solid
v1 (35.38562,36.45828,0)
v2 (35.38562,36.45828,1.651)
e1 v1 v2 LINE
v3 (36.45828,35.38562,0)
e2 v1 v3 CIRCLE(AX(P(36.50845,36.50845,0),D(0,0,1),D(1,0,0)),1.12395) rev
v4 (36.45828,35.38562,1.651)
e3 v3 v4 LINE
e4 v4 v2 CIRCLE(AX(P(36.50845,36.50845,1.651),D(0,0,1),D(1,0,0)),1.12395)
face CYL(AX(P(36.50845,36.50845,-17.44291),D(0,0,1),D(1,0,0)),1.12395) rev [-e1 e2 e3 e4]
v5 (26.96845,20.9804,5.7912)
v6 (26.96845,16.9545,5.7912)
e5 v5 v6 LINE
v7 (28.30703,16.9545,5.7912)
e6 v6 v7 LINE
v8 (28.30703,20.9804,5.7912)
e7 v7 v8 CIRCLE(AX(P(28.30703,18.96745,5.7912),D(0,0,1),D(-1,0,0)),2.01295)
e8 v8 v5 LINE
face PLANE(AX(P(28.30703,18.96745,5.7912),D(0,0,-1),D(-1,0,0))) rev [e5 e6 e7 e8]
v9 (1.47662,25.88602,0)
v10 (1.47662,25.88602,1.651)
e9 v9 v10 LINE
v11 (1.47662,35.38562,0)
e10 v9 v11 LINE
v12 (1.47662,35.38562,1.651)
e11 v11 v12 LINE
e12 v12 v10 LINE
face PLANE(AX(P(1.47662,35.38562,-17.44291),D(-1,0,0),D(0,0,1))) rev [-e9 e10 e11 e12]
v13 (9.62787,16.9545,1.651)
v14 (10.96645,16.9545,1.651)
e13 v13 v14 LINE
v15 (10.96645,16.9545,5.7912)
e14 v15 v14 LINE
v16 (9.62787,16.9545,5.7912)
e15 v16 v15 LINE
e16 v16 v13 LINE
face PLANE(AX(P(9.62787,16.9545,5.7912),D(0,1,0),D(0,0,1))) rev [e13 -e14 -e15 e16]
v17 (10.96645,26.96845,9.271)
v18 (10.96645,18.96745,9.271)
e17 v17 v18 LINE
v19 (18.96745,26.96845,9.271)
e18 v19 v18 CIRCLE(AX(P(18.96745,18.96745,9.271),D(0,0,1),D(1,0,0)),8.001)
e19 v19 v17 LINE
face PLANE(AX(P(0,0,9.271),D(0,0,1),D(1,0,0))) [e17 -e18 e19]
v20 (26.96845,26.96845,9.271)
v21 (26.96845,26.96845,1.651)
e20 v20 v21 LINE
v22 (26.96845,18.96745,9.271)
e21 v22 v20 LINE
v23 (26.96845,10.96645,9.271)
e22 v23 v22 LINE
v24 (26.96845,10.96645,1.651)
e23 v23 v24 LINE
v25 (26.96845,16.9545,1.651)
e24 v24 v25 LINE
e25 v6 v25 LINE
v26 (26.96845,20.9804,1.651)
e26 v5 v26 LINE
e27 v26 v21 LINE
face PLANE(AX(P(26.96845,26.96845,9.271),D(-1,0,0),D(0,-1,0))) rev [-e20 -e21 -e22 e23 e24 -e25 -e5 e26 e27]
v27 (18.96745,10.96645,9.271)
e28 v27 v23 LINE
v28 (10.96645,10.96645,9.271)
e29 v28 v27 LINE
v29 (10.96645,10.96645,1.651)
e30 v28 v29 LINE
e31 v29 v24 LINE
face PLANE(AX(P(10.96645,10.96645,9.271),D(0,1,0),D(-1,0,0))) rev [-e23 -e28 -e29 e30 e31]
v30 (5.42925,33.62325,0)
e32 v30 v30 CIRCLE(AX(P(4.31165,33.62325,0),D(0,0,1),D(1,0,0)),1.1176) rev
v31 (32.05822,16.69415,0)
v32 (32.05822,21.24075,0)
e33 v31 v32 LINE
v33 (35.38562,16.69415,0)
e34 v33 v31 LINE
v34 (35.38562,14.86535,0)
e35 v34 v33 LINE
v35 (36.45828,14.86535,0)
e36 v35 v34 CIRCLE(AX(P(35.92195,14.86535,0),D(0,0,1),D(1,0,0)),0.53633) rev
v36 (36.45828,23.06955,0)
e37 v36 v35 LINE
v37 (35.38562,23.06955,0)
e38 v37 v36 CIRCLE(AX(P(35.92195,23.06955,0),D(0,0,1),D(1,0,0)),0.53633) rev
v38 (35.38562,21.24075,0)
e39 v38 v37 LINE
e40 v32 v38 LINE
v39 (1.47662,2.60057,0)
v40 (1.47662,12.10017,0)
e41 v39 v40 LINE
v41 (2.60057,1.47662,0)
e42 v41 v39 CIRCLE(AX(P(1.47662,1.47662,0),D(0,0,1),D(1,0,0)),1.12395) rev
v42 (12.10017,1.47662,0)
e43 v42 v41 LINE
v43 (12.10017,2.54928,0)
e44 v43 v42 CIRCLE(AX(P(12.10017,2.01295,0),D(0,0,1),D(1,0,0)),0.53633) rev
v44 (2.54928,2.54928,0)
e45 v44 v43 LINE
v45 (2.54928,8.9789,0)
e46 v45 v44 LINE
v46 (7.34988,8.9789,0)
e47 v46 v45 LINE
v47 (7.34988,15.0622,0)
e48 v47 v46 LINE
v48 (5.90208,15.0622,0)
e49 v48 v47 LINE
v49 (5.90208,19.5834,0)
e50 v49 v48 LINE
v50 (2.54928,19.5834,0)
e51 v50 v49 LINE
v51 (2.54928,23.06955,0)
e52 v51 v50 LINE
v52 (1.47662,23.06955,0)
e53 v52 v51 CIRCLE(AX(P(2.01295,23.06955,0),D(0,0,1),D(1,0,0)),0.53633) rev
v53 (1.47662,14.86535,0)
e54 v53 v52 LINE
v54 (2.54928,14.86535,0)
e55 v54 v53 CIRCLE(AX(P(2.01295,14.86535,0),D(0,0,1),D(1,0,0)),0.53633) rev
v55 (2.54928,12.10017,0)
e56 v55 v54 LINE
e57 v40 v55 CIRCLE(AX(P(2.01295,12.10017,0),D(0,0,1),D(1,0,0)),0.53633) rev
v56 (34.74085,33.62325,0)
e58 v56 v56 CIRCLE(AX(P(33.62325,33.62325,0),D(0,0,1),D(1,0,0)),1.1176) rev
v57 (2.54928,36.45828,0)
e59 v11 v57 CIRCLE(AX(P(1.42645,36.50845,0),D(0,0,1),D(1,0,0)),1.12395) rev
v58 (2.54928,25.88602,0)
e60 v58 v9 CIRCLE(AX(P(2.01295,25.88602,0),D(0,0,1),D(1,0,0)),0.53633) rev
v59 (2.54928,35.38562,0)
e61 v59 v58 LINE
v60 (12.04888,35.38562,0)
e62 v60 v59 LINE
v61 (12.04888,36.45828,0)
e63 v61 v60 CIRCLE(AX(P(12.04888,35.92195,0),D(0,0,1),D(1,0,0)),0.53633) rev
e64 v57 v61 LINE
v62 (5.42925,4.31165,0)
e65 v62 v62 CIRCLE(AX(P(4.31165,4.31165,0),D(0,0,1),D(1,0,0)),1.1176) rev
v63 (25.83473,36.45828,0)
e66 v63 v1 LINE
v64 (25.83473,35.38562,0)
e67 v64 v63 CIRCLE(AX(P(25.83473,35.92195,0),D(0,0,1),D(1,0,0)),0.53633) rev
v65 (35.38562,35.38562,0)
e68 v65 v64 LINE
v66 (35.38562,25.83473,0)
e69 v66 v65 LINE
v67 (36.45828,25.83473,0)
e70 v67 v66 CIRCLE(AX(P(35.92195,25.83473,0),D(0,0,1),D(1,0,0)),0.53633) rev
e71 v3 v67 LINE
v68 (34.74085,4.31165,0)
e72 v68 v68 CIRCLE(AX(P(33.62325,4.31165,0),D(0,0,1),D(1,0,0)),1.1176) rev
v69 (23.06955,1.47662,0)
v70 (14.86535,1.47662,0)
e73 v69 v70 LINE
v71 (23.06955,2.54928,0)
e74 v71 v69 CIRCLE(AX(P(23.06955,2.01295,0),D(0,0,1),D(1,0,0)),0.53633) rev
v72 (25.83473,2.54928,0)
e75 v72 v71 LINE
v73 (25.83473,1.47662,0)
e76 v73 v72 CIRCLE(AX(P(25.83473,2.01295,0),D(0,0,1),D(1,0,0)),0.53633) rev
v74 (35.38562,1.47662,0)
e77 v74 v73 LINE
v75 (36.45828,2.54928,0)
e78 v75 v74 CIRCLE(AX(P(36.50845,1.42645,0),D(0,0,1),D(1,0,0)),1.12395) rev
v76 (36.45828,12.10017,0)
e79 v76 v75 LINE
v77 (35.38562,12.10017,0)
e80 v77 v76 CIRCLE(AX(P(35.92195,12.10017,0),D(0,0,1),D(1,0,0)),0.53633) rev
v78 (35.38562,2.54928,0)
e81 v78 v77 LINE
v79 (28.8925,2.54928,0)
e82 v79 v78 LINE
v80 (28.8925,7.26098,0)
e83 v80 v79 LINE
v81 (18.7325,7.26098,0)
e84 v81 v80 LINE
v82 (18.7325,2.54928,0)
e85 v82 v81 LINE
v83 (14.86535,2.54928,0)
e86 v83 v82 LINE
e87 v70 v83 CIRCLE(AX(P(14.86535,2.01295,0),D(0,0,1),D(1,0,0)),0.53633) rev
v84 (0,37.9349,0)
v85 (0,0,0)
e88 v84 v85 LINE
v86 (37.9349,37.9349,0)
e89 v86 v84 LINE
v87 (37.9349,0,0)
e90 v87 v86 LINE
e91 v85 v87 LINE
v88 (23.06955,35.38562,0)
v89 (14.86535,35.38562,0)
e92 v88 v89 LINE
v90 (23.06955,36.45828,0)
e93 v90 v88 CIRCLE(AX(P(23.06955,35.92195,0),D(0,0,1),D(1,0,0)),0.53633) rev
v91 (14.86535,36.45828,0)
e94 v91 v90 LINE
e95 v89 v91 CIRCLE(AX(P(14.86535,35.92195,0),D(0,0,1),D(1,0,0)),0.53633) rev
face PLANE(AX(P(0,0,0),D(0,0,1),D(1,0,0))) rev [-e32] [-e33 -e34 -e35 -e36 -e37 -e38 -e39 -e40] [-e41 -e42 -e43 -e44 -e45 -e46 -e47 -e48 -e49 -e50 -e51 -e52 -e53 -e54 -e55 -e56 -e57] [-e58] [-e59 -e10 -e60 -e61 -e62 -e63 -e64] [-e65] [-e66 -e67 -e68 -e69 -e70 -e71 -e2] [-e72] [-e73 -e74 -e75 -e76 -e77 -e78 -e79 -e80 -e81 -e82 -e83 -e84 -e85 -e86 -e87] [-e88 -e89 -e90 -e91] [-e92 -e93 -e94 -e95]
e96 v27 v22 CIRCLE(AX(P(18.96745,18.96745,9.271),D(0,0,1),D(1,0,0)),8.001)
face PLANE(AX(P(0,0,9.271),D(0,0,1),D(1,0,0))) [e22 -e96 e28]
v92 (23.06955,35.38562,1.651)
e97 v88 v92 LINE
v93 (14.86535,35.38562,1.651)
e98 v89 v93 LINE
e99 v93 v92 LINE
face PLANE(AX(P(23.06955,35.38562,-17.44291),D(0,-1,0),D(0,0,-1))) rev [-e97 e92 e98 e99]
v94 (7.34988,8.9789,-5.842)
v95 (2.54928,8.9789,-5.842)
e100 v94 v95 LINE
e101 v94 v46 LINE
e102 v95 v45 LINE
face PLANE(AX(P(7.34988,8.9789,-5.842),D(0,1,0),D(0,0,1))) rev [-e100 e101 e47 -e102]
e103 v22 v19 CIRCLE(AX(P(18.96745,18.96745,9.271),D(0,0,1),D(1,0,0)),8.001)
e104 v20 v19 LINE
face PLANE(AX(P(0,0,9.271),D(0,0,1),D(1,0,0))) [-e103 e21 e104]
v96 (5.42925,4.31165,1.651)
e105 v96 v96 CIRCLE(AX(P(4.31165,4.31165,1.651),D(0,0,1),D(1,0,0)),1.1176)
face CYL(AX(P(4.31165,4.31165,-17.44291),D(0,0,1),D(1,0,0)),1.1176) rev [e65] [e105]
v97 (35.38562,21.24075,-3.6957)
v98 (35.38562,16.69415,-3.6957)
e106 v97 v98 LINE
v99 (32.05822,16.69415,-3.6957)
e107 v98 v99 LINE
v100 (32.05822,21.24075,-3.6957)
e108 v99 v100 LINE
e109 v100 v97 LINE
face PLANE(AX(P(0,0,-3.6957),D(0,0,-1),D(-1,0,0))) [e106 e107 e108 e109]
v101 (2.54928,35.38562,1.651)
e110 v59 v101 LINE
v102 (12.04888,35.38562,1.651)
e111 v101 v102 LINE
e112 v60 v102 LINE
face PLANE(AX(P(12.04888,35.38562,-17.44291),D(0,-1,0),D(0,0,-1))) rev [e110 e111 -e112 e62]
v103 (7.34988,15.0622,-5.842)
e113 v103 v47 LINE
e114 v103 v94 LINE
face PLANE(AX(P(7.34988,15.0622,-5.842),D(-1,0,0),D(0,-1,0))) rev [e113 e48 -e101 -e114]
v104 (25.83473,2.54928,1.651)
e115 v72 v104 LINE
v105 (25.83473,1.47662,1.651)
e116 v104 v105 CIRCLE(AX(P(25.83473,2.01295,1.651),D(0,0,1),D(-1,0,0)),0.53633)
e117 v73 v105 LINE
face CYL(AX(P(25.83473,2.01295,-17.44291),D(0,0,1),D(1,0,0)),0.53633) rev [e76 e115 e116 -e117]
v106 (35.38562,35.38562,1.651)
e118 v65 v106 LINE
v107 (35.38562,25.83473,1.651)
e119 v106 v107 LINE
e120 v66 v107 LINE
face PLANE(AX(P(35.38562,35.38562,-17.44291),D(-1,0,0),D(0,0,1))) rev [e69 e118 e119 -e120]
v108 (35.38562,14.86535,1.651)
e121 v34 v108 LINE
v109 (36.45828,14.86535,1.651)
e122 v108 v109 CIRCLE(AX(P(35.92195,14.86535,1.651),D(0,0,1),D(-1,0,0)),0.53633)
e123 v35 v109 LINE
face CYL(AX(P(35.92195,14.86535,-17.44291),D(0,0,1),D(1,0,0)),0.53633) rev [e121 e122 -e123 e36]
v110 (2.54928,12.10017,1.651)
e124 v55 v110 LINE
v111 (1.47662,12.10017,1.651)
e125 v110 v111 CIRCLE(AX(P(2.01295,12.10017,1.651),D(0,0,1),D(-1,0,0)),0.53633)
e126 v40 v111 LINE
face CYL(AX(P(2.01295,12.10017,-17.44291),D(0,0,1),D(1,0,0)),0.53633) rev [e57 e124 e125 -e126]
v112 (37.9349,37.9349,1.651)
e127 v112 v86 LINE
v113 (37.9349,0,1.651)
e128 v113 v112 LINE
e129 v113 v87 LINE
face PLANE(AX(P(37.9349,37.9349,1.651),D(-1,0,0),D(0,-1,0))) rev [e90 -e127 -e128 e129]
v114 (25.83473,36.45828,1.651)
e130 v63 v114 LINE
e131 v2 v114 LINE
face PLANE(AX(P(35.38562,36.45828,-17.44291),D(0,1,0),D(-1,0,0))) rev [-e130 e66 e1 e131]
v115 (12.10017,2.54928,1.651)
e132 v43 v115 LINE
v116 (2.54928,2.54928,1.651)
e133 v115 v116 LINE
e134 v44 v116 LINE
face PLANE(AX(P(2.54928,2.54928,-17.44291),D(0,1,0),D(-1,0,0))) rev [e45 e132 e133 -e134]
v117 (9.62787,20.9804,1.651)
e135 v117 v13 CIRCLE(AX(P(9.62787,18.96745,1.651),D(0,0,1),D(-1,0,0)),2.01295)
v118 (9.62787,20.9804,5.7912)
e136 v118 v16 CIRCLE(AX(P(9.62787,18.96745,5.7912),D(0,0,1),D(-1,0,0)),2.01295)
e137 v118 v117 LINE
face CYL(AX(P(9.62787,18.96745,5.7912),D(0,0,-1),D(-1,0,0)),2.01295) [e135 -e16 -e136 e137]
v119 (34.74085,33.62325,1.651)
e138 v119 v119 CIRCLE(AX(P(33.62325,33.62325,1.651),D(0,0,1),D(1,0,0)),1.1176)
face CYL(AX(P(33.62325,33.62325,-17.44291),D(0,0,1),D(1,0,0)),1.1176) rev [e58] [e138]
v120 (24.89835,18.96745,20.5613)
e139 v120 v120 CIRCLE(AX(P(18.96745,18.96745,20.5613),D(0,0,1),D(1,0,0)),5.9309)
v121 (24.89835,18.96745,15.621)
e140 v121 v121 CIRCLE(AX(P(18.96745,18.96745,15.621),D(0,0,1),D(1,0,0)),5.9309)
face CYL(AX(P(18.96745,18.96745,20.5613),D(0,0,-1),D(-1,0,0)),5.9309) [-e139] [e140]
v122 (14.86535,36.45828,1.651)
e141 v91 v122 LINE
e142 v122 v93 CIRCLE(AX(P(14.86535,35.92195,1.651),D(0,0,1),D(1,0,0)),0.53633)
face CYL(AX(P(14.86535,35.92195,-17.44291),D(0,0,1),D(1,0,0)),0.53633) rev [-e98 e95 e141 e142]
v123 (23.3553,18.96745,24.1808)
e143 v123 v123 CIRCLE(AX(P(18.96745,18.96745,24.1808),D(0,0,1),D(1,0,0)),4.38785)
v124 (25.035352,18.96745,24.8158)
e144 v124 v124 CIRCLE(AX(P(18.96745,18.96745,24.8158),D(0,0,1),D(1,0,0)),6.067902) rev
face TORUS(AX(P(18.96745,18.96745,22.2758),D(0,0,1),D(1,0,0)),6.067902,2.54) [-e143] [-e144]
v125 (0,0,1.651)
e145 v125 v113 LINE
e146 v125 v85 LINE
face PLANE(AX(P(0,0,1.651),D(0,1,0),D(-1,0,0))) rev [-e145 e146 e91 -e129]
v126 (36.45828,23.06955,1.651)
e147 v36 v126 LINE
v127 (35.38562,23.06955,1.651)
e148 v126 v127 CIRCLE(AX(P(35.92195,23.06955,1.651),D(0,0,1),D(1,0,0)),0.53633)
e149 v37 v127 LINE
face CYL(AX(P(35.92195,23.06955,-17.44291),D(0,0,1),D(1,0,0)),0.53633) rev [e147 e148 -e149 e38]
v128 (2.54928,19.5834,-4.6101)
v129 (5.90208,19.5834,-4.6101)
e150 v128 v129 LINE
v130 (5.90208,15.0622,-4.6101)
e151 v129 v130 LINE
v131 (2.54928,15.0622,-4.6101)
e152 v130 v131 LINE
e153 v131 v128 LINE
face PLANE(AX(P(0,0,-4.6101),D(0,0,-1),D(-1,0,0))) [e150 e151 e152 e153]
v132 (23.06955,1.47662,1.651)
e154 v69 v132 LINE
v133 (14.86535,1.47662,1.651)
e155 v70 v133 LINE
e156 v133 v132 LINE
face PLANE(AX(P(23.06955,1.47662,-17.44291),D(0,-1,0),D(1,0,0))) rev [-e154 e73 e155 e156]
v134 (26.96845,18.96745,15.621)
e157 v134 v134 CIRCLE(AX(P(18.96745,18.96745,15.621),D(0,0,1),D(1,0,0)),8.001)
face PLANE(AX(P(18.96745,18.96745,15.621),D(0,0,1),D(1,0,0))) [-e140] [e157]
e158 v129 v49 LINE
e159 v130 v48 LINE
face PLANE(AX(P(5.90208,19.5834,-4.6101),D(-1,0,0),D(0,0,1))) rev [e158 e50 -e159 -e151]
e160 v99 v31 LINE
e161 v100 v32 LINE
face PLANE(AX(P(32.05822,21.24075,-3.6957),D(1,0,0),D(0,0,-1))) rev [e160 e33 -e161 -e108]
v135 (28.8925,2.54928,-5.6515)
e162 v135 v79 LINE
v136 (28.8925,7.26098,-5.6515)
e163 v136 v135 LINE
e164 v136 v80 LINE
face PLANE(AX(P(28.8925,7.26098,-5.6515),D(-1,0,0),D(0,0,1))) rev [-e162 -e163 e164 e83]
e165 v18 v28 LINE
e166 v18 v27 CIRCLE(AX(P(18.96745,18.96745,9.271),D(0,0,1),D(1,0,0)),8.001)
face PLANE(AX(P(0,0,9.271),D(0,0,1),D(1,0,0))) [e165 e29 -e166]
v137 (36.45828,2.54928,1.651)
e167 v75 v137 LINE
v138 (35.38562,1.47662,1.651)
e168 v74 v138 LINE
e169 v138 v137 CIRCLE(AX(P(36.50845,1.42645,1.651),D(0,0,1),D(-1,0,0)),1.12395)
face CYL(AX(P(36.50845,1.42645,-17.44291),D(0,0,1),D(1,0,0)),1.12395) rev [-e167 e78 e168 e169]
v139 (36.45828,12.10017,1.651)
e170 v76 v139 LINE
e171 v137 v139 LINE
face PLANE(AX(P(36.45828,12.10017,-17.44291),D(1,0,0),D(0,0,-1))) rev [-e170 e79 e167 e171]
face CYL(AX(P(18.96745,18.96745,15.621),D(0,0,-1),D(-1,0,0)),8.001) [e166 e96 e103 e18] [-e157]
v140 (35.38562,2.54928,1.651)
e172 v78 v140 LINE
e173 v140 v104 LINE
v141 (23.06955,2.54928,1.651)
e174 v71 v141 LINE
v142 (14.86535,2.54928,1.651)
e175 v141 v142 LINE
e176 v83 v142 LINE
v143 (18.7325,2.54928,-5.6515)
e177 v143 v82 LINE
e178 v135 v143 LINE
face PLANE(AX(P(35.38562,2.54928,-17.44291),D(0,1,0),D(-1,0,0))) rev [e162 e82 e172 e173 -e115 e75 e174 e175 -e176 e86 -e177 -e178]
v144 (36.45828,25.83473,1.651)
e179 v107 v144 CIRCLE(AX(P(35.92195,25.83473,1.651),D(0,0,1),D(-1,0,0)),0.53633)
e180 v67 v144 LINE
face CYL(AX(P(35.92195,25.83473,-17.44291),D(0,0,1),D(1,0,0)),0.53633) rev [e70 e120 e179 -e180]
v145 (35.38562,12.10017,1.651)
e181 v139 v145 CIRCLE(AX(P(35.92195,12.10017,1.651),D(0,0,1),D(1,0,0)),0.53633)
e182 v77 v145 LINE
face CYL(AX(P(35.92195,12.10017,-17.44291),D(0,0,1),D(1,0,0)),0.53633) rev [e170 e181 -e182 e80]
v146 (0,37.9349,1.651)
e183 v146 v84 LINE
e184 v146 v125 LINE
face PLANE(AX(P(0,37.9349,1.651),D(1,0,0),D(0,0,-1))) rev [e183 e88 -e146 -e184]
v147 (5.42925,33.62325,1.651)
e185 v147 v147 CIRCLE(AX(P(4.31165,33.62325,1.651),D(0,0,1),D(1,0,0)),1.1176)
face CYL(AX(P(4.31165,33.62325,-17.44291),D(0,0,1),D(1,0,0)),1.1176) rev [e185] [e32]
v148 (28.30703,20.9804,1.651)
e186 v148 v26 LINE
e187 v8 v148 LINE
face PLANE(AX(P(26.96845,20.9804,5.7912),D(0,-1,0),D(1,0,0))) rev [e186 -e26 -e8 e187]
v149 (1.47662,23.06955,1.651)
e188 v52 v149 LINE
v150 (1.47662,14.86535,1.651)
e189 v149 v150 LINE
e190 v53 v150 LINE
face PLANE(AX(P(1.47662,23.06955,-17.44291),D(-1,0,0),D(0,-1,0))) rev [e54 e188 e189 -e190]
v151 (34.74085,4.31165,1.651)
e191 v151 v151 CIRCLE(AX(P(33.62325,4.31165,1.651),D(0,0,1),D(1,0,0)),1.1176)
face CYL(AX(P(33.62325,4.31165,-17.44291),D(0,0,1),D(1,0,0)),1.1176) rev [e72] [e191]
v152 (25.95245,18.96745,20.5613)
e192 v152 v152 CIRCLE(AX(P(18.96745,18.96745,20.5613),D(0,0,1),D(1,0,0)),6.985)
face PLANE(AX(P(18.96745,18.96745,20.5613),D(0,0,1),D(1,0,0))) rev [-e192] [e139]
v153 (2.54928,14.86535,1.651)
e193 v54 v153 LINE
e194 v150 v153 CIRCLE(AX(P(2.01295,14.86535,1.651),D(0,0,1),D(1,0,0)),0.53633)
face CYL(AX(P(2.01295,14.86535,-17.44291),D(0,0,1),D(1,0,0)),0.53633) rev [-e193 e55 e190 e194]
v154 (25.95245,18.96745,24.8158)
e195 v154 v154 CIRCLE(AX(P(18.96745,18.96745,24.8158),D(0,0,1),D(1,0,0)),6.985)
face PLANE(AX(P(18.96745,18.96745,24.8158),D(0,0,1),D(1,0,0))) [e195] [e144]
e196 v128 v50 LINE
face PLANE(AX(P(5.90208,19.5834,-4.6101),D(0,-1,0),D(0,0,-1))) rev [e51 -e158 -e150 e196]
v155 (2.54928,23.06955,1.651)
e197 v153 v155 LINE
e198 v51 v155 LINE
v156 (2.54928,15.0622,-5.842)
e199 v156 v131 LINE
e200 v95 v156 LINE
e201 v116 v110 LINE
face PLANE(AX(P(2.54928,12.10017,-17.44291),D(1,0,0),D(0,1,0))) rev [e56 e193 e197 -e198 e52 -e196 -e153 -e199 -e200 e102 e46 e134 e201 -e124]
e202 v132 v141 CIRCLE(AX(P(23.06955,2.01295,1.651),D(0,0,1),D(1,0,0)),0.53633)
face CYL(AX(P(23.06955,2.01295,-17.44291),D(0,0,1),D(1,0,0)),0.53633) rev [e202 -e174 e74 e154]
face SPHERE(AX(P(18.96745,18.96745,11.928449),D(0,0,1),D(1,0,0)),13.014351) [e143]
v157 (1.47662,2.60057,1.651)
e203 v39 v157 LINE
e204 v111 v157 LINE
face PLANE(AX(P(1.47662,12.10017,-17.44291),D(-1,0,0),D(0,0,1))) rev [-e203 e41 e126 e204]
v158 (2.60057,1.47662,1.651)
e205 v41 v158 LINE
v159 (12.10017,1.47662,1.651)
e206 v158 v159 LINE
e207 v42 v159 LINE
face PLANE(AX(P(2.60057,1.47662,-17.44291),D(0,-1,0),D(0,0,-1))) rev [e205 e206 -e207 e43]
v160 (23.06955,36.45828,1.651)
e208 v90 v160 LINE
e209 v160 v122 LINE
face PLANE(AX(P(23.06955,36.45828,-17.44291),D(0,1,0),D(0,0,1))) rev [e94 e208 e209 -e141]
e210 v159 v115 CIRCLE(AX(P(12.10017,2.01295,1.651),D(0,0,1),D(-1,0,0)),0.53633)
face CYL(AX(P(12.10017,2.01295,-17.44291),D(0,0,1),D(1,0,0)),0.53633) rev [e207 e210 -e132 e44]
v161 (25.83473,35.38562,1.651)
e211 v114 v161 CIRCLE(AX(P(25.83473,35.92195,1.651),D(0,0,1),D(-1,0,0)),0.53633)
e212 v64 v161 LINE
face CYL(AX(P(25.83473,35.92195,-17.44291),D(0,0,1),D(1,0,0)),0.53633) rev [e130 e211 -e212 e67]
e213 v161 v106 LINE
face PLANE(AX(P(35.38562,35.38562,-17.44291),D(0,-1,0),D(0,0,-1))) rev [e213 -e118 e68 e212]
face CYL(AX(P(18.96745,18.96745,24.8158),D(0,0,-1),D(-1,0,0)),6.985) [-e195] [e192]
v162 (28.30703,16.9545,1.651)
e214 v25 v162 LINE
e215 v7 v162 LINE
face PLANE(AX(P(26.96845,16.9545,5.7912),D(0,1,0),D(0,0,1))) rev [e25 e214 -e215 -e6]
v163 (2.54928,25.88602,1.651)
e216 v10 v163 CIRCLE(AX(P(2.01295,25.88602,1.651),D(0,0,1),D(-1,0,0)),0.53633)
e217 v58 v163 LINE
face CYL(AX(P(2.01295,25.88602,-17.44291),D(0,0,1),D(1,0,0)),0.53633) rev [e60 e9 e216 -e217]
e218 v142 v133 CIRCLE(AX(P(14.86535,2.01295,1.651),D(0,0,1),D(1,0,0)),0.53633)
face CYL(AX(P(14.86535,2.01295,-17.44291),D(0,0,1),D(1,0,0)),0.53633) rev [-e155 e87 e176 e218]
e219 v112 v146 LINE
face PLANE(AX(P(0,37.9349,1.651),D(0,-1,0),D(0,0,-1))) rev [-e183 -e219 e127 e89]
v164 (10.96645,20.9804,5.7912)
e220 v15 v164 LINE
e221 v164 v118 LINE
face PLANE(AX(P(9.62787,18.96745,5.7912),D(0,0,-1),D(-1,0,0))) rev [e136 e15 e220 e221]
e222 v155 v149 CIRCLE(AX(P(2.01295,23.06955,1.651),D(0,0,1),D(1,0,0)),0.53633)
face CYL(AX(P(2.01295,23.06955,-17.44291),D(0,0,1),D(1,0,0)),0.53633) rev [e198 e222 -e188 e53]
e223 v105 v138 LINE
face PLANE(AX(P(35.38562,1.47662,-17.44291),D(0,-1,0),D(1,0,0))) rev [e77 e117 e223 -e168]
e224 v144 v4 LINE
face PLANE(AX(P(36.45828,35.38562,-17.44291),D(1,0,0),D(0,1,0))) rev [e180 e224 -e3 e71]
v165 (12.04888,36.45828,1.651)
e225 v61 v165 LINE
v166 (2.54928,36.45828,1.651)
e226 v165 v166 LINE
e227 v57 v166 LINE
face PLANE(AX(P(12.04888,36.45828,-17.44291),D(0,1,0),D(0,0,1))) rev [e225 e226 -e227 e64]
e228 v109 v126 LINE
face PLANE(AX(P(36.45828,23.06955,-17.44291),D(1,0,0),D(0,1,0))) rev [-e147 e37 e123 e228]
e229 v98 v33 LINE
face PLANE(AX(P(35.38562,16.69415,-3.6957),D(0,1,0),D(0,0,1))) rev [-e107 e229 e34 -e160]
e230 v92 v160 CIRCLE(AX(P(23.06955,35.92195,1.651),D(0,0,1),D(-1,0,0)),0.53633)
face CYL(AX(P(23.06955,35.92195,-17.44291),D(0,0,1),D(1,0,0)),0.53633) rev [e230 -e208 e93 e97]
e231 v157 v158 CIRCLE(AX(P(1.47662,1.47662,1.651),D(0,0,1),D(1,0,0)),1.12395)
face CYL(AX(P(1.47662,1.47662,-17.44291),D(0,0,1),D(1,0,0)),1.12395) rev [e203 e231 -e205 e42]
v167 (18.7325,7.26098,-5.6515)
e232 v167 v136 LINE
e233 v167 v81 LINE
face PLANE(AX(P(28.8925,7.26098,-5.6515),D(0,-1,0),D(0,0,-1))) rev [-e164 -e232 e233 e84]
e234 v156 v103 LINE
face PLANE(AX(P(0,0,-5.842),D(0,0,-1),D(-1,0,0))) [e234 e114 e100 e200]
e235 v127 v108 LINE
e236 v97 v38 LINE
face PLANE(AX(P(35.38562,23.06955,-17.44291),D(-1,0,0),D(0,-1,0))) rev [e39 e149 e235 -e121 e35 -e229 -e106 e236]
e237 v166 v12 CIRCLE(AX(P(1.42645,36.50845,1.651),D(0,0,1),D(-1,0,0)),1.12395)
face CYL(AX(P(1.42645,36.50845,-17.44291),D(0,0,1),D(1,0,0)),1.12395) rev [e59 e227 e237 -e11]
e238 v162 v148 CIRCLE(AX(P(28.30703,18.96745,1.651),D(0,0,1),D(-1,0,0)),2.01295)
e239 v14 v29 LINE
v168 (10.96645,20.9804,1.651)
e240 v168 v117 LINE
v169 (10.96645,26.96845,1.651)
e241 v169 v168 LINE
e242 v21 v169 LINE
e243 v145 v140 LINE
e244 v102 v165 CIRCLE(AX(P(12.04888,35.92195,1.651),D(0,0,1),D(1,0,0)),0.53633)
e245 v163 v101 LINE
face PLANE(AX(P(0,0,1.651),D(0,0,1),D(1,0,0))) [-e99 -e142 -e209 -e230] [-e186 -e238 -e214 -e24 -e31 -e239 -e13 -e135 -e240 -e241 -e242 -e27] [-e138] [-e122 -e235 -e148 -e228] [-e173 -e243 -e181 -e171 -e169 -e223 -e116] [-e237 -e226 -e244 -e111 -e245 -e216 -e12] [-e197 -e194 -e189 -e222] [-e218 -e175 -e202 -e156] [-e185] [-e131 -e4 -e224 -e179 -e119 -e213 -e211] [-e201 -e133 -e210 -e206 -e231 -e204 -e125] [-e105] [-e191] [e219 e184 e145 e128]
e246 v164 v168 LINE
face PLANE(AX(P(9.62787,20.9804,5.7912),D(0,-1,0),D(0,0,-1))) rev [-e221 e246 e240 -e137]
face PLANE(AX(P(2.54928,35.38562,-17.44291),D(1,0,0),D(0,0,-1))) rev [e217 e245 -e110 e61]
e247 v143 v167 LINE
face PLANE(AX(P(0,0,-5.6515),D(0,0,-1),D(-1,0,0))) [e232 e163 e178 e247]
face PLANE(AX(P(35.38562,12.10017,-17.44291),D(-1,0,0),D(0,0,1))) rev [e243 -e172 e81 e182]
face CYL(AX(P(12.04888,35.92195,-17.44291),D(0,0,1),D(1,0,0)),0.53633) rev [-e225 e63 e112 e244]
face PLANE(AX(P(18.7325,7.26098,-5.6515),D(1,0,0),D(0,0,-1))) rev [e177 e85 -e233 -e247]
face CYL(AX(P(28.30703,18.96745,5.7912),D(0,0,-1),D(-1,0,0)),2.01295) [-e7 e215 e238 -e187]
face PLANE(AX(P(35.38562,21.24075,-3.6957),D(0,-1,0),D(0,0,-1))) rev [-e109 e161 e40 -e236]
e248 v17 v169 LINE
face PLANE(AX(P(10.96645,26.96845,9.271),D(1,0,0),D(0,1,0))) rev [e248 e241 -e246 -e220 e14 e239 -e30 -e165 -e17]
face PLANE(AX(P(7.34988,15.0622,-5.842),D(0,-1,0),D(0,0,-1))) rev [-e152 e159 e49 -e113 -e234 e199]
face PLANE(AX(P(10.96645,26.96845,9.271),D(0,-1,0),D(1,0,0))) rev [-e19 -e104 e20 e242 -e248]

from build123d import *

# Parameters (mm, degrees)
SKETCH1_W            = 37.9349
SKETCH1_H            = 37.9349
BOSS_EXTRUDE1_DEPTH  = 1.651
SKETCH2_W            = 16.002
SKETCH2_H            = 16.002
BOSS_EXTRUDE2_DEPTH  = 7.62
SKETCH3_R            = 8.001
BOSS_EXTRUDE3_DEPTH  = 6.35
SKETCH4_R            = 5.9309
BOSS_EXTRUDE4_DEPTH  = 4.9403
SKETCH5_R            = 6.985
BOSS_EXTRUDE5_DEPTH  = 4.2545
SKETCH6_R            = 4.38785
CUT_EXTRUDE1_DEPTH   = 0.635
FILLET2_R            = 2.54
SKETCH9_R            = 1.1176
CUT_EXTRUDE2_DEPTH   = 1.651
SKETCH12_W           = 3.3274
SKETCH12_H           = 4.5466
BOSS_EXTRUDE6_DEPTH  = 3.6957
SKETCH13_W           = 10.16
SKETCH13_H           = 4.7117
BOSS_EXTRUDE7_DEPTH  = 5.6515
SKETCH14_W           = 4.8006
SKETCH14_H           = 6.0833
BOSS_EXTRUDE8_DEPTH  = 5.842
SKETCH15_W           = 3.3528
SKETCH15_H           = 4.5212
BOSS_EXTRUDE9_DEPTH  = 4.6101
BOSS_EXTRUDE10_DEPTH = 4.1402


# Read off the part's stored shape, not the designer's step: Dome1
with BuildPart() as part:
    # Sketch1 → Boss-Extrude1 (new body)
    with BuildSketch(Plane.XY):
        with Locations((18.96745, 18.96745)):
            Rectangle(SKETCH1_W, SKETCH1_H)
    extrude(amount=BOSS_EXTRUDE1_DEPTH)

    # Sketch2 → Boss-Extrude2 (add)
    with BuildSketch(Plane.XY.offset(1.651)):
        with Locations((18.96745, 18.96745)):
            Rectangle(SKETCH2_W, SKETCH2_H)
    extrude(amount=BOSS_EXTRUDE2_DEPTH)

    # Sketch3 → Boss-Extrude3 (add)
    with BuildSketch(Plane.XY.offset(9.271)):
        with Locations((18.96745, 18.96745)):
            Circle(SKETCH3_R)
    extrude(amount=BOSS_EXTRUDE3_DEPTH)

    # Sketch4 → Boss-Extrude4 (add)
    with BuildSketch(Plane.XY.offset(15.621)):
        with Locations((18.96745, 18.96745)):
            Circle(SKETCH4_R)
    extrude(amount=BOSS_EXTRUDE4_DEPTH)

    # Sketch5 → Boss-Extrude5 (add)
    with BuildSketch(Plane.XY.offset(20.5613)):
        with Locations((18.96745, 18.96745)):
            Circle(SKETCH5_R)
    extrude(amount=BOSS_EXTRUDE5_DEPTH)

    # Sketch6 → Cut-Extrude1 (cut)
    with BuildSketch(Plane.XY.offset(24.8158)):
        with Locations((18.96745, 18.96745)):
            Circle(SKETCH6_R)
    extrude(amount=-CUT_EXTRUDE1_DEPTH, mode=Mode.SUBTRACT)

    # Fillet2
    # the kernel refuses this fillet: 2.54 mm, written as the material it takes off along each edge
    with BuildSketch(Plane(origin=(18.96745, 18.96745, 24.8158), x_dir=(1, 0, 0), z_dir=(0, -1, 0))) as fillet2_piece_1:
        with BuildLine():
            CenterArc((6.067902083, -2.54), FILLET2_R, 90, 41.409622109)
            Line((4.38785, -0.635), (4.354248958, -0.5969))
            ThreePointArc((4.354248958, -0.5969), (4.33705, -0.3175), (4.33705, 0))
            Line((4.33705, 0), (4.38785, 0.0508))
            Line((4.38785, 0.0508), (6.067902083, 0.0508))
            Line((6.067902083, 0.0508), (6.067902083, 0))
        make_face()
    revolve(axis=Axis((18.96745, 18.96745, 24.8158), (0, 0, 1)), mode=Mode.SUBTRACT)

    # Dome1 outline → Dome1 (revolve)
    with BuildSketch(Plane(origin=(18.96745, 18.96745, 0), x_dir=(1, 0, 0), z_dir=(0, -1, 0))):
        with BuildLine():
            Line((0, 24.1808), (4.387850012, 24.180799996))
            ThreePointArc((4.387850012, 24.180799996), (2.22676176, 24.75088497), (0, 24.9428))
            Line((0, 24.9428), (0, 24.1808))
        make_face()
    revolve(axis=Axis((18.96745, 18.96745, 0), (0, 0, 1)))

    # Sketch9 → Cut-Extrude2 (cut)
    with BuildSketch(Plane.XY.offset(1.651)):
        with Locations((33.62325, 33.62325)):
            Circle(SKETCH9_R)
        with Locations((4.31165, 33.62325)):
            Circle(SKETCH9_R)
        with Locations((4.31165, 4.31165)):
            Circle(SKETCH9_R)
        with Locations((33.62325, 4.31165)):
            Circle(SKETCH9_R)
        with BuildLine():
            Line((35.385619933, 12.100169933), (35.385619933, 2.549280067))
            Line((35.385619933, 2.549280067), (25.834730067, 2.549280067))
            ThreePointArc((25.834730067, 2.549280067), (25.2984, 2.01295), (25.834730067, 1.476619933))
            Line((25.834730067, 1.476619933), (35.385619933, 1.476619933))
            ThreePointArc((35.385619933, 1.476619933), (37.303202335, 0.631697665), (36.458280067, 2.549280067))
            Line((36.458280067, 2.549280067), (36.458280067, 12.100169933))
            ThreePointArc((36.458280067, 12.100169933), (35.92195, 12.6365), (35.385619933, 12.100169933))
        make_face()
        with BuildLine():
            Line((35.385619933, 36.458280067), (25.834730067, 36.458280067))
            ThreePointArc((25.834730067, 36.458280067), (25.2984, 35.92195), (25.834730067, 35.385619933))
            Line((25.834730067, 35.385619933), (35.385619933, 35.385619933))
            Line((35.385619933, 35.385619933), (35.385619933, 25.834730067))
            ThreePointArc((35.385619933, 25.834730067), (35.92195, 25.2984), (36.458280067, 25.834730067))
            Line((36.458280067, 25.834730067), (36.458280067, 35.385619933))
            ThreePointArc((36.458280067, 35.385619933), (37.303202335, 37.303202335), (35.385619933, 36.458280067))
        make_face()
        with BuildLine():
            Line((12.048880067, 36.458280067), (2.549280067, 36.458280067))
            ThreePointArc((2.549280067, 36.458280067), (0.631697665, 37.303202335), (1.476619933, 35.385619933))
            Line((1.476619933, 35.385619933), (1.476619933, 25.886019933))
            ThreePointArc((1.476619933, 25.886019933), (2.01295, 25.349689867), (2.549280067, 25.886019933))
            Line((2.549280067, 25.886019933), (2.549280067, 35.385619933))
            Line((2.549280067, 35.385619933), (12.048880067, 35.385619933))
            ThreePointArc((12.048880067, 35.385619933), (12.585210133, 35.92195), (12.048880067, 36.458280067))
        make_face()
        with BuildLine():
            Line((23.06955, 36.458280067), (14.86535, 36.458280067))
            ThreePointArc((14.86535, 36.458280067), (14.329019933, 35.92195), (14.86535, 35.385619933))
            Line((14.86535, 35.385619933), (23.06955, 35.385619933))
            ThreePointArc((23.06955, 35.385619933), (23.605880067, 35.92195), (23.06955, 36.458280067))
        make_face()
        with BuildLine():
            Line((2.549280067, 23.06955), (2.549280067, 14.86535))
            ThreePointArc((2.549280067, 14.86535), (2.01295, 14.329019933), (1.476619933, 14.86535))
            Line((1.476619933, 14.86535), (1.476619933, 23.06955))
            ThreePointArc((1.476619933, 23.06955), (2.01295, 23.605880067), (2.549280067, 23.06955))
        make_face()
        with BuildLine():
            Line((36.458280067, 23.06955), (36.458280067, 14.86535))
            ThreePointArc((36.458280067, 14.86535), (35.92195, 14.329019933), (35.385619933, 14.86535))
            Line((35.385619933, 14.86535), (35.385619933, 23.06955))
            ThreePointArc((35.385619933, 23.06955), (35.92195, 23.605880067), (36.458280067, 23.06955))
        make_face()
        with BuildLine():
            Line((23.06955, 2.549280067), (14.86535, 2.549280067))
            ThreePointArc((14.86535, 2.549280067), (14.329019933, 2.01295), (14.86535, 1.476619933))
            Line((14.86535, 1.476619933), (23.06955, 1.476619933))
            ThreePointArc((23.06955, 1.476619933), (23.605880067, 2.01295), (23.06955, 2.549280067))
        make_face()
        with BuildLine():
            Line((2.549280067, 12.100169933), (2.549280067, 2.549280067))
            Line((2.549280067, 2.549280067), (12.100169933, 2.549280067))
            ThreePointArc((12.100169933, 2.549280067), (12.6365, 2.01295), (12.100169933, 1.476619933))
            Line((12.100169933, 1.476619933), (2.600569933, 1.476619933))
            ThreePointArc((2.600569933, 1.476619933), (0.681867267, 0.681867267), (1.476619933, 2.600569933))
            Line((1.476619933, 2.600569933), (1.476619933, 12.100169933))
            ThreePointArc((1.476619933, 12.100169933), (2.01295, 12.6365), (2.549280067, 12.100169933))
        make_face()
    extrude(amount=-CUT_EXTRUDE2_DEPTH, mode=Mode.SUBTRACT)

    # Sketch12 → Boss-Extrude6 (add)
    with BuildSketch(Plane(origin=(0, 0, 0), x_dir=(-1, 0, 0), z_dir=(0, 0, -1))):
        with Locations((-33.721919933, 18.96745)):
            Rectangle(SKETCH12_W, SKETCH12_H)
    extrude(amount=BOSS_EXTRUDE6_DEPTH)

    # Sketch13 → Boss-Extrude7 (add)
    with BuildSketch(Plane(origin=(0, 0, 0), x_dir=(-1, 0, 0), z_dir=(0, 0, -1))):
        with Locations((-23.8125, 4.905130067)):
            Rectangle(SKETCH13_W, SKETCH13_H)
    extrude(amount=BOSS_EXTRUDE7_DEPTH)

    # Sketch14 → Boss-Extrude8 (add)
    with BuildSketch(Plane(origin=(0, 0, 0), x_dir=(-1, 0, 0), z_dir=(0, 0, -1))):
        with Locations((-4.949580067, 12.02055)):
            Rectangle(SKETCH14_W, SKETCH14_H)
    extrude(amount=BOSS_EXTRUDE8_DEPTH)

    # Sketch15 → Boss-Extrude9 (add)
    with BuildSketch(Plane(origin=(0, 0, 0), x_dir=(-1, 0, 0), z_dir=(0, 0, -1))):
        with Locations((-4.225680067, 17.3228)):
            Rectangle(SKETCH15_W, SKETCH15_H)
    extrude(amount=BOSS_EXTRUDE9_DEPTH)

    # Sketch16 → Boss-Extrude10 (add)
    with BuildSketch(Plane.XY.offset(1.651)):
        with BuildLine():
            Line((26.96845, 16.9545), (28.30703, 16.9545))
            ThreePointArc((28.30703, 16.9545), (30.31998, 18.96745), (28.30703, 20.9804))
            Line((28.30703, 20.9804), (26.96845, 20.9804))
            Line((26.96845, 20.9804), (26.96845, 16.9545))
        make_face()
        with BuildLine():
            Line((9.62787, 20.9804), (10.96645, 20.9804))
            Line((10.96645, 20.9804), (10.96645, 16.9545))
            Line((10.96645, 16.9545), (9.62787, 16.9545))
            ThreePointArc((9.62787, 16.9545), (7.61492, 18.96745), (9.62787, 20.9804))
        make_face()
    extrude(amount=BOSS_EXTRUDE10_DEPTH)


solid = part.part
